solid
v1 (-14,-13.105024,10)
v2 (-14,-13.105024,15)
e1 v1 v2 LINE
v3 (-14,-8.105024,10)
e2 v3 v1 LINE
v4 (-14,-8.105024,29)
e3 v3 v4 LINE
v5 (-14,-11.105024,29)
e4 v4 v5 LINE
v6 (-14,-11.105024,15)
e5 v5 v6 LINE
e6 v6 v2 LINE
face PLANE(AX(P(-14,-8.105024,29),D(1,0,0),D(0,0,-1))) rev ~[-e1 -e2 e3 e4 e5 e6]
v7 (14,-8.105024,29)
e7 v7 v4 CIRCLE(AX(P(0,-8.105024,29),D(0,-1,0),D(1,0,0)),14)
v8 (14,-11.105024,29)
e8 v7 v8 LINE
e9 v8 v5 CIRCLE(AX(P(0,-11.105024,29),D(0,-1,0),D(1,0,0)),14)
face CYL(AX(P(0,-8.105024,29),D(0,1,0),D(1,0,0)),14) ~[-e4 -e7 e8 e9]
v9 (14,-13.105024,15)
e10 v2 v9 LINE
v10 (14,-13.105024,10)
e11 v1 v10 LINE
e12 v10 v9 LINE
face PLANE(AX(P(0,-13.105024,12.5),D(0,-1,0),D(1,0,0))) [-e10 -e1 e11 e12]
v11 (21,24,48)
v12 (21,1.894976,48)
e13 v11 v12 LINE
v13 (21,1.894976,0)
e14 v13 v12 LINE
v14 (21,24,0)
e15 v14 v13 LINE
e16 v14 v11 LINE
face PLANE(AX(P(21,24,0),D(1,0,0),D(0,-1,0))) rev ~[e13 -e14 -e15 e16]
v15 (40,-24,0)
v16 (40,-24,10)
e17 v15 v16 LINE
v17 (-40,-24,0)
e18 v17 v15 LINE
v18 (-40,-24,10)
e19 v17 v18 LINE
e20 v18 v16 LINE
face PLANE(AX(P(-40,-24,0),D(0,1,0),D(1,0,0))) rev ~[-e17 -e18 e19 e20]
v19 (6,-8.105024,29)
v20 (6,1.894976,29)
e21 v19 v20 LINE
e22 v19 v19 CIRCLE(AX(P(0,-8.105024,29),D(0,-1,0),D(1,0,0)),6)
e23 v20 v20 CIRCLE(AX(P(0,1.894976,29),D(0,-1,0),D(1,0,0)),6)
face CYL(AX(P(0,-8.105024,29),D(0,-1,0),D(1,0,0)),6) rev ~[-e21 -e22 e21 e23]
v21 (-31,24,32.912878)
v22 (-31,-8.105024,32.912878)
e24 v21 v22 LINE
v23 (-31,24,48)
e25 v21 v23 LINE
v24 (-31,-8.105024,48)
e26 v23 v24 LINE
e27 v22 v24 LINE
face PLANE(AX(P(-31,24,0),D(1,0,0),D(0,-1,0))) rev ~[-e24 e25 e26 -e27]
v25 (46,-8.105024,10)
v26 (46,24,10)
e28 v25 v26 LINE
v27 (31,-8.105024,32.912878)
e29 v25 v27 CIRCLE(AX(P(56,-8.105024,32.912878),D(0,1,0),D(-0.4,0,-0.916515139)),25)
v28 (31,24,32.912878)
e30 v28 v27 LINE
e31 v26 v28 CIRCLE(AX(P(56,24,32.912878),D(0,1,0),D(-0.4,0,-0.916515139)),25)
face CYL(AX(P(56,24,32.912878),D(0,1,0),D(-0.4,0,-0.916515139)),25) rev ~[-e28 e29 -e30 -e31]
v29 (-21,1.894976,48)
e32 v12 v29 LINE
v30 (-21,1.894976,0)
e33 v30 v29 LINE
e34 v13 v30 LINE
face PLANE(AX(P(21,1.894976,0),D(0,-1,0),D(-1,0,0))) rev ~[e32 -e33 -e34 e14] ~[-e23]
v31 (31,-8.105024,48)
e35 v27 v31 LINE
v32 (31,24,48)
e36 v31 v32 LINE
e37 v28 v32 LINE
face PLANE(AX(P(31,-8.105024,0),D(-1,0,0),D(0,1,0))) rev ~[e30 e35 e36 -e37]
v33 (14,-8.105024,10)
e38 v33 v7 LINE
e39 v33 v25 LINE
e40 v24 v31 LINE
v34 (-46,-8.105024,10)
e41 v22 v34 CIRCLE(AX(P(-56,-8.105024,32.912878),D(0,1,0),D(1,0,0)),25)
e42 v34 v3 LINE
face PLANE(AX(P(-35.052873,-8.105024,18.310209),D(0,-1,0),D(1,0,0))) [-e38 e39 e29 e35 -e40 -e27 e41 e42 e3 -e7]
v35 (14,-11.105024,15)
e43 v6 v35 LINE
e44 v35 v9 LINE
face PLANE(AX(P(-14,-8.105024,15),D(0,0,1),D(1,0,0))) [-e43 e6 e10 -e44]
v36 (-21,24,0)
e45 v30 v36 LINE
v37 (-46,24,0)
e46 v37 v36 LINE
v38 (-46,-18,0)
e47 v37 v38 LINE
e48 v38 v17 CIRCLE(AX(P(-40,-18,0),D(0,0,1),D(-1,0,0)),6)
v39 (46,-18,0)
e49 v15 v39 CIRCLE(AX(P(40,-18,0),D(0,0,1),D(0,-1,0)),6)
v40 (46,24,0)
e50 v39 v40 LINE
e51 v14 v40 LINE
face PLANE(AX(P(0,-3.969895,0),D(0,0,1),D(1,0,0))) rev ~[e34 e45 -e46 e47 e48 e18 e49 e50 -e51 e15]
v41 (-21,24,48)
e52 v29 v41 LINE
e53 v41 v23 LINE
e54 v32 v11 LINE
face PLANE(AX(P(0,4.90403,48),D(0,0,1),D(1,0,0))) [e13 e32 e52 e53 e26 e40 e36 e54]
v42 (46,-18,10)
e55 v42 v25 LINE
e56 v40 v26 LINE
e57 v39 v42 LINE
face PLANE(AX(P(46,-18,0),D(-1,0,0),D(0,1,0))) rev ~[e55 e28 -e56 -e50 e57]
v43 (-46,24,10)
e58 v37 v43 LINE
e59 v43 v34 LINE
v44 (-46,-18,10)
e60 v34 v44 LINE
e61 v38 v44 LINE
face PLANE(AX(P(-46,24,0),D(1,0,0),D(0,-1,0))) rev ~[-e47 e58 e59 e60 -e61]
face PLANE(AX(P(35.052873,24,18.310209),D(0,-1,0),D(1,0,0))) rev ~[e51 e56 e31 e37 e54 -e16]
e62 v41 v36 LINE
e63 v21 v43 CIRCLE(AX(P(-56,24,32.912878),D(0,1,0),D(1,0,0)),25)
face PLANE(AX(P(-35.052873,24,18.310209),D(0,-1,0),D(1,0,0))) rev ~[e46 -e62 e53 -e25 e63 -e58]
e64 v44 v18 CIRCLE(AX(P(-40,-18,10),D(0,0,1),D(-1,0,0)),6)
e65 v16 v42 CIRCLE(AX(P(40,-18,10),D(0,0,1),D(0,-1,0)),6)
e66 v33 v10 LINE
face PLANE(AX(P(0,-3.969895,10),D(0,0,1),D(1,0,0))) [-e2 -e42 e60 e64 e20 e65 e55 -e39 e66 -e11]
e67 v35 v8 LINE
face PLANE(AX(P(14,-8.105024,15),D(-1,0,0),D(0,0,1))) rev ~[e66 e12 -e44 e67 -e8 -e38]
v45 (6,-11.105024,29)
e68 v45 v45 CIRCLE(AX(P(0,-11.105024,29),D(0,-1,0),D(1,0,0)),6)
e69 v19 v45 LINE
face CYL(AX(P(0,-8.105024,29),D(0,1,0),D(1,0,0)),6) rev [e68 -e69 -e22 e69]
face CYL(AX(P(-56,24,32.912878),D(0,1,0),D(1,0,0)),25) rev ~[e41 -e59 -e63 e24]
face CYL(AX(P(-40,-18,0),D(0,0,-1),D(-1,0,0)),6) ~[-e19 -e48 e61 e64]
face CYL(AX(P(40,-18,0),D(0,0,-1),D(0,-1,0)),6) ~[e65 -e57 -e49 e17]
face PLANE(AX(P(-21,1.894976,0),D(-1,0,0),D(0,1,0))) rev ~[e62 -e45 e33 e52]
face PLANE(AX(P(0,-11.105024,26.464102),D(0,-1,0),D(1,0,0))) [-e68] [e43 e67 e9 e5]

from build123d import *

# Parameters (mm, degrees)
F1_DEPTH    = 48
F2_DEPTH    = 10
F3_T1_DEPTH = 32.1050237641
F4_T1_DEPTH = 32.1050237641
F5_W        = 28
F5_H        = 5
F6_DEPTH    = 5
F5_R        = 6
F7_DEPTH    = 3
F8_DEPTH    = 25


# Not quite as in the source:
# - a fillet or chamfer that OpenCascade refuses, or shapes differently, is made with other operations: its cross-section is extruded or revolved along the edge and cut away or added


with BuildPart() as f1:
    # F0 (on Top) → F1 (new body)
    with BuildSketch(Plane.XY):
        Polygon((31, -8.1050237641), (31, 24), (21, 24), (21, 1.8949762359), (-21, 1.8949762359), (-21, 24), (-31, 24), (-31, -8.1050237641), align=None)
    extrude(amount=F1_DEPTH)

    # F0 (on Top) → F2 (join)
    with BuildSketch(Plane.XY):
        with BuildLine():
            Line((-40, -24), (40, -24))
            ThreePointArc((40, -24), (44.2426406871, -22.2426406871), (46, -18))
            Line((46, -18), (46, 24))
            Line((46, 24), (31, 24))
            Line((31, 24), (31, -8.1050237641))
            Line((31, -8.1050237641), (-31, -8.1050237641))
            Line((-31, -8.1050237641), (-31, 24))
            Line((-31, 24), (-46, 24))
            Line((-46, 24), (-46, -18))
            ThreePointArc((-46, -18), (-44.2426406871, -22.2426406871), (-40, -24))
        make_face()
        Polygon((31, -8.1050237641), (31, 24), (21, 24), (21, 1.8949762359), (-21, 1.8949762359), (-21, 24), (-31, 24), (-31, -8.1050237641), align=None)
    extrude(amount=F2_DEPTH)

    # F3: fillet of radius 25 on 1 edges, made by hand

    # F3_s2 → F3_t1 (join)
    with BuildSketch(Plane.XZ.offset(-24)):
        with BuildLine():
            ThreePointArc((46, 10), (35.0834993366, 19.2198145372), (31, 32.9128784748))
            Line((31, 32.9128784748), (31, 10))
            Line((31, 10), (46, 10))
        make_face()
    extrude(amount=F3_T1_DEPTH)

    # F4: fillet of radius 25 on 1 edges, made by hand

    # F4_s2 → F4_t1 (join)
    with BuildSketch(Plane.XZ.offset(-24)):
        with BuildLine():
            ThreePointArc((-31, 32.9128784748), (-35.0834993366, 19.2198145372), (-46, 10))
            Line((-46, 10), (-31, 10))
            Line((-31, 10), (-31, 32.9128784748))
        make_face()
    extrude(amount=F4_T1_DEPTH)

    # F5 (on face) → F6 (join)
    with BuildSketch(Plane.XZ.offset(8.1050237641)):
        with Locations((0, 12.5)):
            Rectangle(F5_W, F5_H)
    extrude(amount=F6_DEPTH)

    # F5 (on face) → F7 (join)
    with BuildSketch(Plane.XZ.offset(8.1050237641)):
        with BuildLine():
            Line((14, 15), (14, 29))
            ThreePointArc((14, 29), (0, 43), (-14, 29))
            Line((-14, 29), (-14, 15))
            Line((-14, 15), (14, 15))
        make_face()
        with Locations((0, 29)):
            Circle(F5_R, mode=Mode.SUBTRACT)
    extrude(amount=F7_DEPTH)

    # F8 (cut): a face of the model
    f8_faces = [f1.faces().sort_by_distance(p)[0] for p in [
        (0, -8.1050237641, 29),
    ]]
    extrude(f8_faces, amount=-F8_DEPTH, mode=Mode.SUBTRACT)


solid = f1.part
